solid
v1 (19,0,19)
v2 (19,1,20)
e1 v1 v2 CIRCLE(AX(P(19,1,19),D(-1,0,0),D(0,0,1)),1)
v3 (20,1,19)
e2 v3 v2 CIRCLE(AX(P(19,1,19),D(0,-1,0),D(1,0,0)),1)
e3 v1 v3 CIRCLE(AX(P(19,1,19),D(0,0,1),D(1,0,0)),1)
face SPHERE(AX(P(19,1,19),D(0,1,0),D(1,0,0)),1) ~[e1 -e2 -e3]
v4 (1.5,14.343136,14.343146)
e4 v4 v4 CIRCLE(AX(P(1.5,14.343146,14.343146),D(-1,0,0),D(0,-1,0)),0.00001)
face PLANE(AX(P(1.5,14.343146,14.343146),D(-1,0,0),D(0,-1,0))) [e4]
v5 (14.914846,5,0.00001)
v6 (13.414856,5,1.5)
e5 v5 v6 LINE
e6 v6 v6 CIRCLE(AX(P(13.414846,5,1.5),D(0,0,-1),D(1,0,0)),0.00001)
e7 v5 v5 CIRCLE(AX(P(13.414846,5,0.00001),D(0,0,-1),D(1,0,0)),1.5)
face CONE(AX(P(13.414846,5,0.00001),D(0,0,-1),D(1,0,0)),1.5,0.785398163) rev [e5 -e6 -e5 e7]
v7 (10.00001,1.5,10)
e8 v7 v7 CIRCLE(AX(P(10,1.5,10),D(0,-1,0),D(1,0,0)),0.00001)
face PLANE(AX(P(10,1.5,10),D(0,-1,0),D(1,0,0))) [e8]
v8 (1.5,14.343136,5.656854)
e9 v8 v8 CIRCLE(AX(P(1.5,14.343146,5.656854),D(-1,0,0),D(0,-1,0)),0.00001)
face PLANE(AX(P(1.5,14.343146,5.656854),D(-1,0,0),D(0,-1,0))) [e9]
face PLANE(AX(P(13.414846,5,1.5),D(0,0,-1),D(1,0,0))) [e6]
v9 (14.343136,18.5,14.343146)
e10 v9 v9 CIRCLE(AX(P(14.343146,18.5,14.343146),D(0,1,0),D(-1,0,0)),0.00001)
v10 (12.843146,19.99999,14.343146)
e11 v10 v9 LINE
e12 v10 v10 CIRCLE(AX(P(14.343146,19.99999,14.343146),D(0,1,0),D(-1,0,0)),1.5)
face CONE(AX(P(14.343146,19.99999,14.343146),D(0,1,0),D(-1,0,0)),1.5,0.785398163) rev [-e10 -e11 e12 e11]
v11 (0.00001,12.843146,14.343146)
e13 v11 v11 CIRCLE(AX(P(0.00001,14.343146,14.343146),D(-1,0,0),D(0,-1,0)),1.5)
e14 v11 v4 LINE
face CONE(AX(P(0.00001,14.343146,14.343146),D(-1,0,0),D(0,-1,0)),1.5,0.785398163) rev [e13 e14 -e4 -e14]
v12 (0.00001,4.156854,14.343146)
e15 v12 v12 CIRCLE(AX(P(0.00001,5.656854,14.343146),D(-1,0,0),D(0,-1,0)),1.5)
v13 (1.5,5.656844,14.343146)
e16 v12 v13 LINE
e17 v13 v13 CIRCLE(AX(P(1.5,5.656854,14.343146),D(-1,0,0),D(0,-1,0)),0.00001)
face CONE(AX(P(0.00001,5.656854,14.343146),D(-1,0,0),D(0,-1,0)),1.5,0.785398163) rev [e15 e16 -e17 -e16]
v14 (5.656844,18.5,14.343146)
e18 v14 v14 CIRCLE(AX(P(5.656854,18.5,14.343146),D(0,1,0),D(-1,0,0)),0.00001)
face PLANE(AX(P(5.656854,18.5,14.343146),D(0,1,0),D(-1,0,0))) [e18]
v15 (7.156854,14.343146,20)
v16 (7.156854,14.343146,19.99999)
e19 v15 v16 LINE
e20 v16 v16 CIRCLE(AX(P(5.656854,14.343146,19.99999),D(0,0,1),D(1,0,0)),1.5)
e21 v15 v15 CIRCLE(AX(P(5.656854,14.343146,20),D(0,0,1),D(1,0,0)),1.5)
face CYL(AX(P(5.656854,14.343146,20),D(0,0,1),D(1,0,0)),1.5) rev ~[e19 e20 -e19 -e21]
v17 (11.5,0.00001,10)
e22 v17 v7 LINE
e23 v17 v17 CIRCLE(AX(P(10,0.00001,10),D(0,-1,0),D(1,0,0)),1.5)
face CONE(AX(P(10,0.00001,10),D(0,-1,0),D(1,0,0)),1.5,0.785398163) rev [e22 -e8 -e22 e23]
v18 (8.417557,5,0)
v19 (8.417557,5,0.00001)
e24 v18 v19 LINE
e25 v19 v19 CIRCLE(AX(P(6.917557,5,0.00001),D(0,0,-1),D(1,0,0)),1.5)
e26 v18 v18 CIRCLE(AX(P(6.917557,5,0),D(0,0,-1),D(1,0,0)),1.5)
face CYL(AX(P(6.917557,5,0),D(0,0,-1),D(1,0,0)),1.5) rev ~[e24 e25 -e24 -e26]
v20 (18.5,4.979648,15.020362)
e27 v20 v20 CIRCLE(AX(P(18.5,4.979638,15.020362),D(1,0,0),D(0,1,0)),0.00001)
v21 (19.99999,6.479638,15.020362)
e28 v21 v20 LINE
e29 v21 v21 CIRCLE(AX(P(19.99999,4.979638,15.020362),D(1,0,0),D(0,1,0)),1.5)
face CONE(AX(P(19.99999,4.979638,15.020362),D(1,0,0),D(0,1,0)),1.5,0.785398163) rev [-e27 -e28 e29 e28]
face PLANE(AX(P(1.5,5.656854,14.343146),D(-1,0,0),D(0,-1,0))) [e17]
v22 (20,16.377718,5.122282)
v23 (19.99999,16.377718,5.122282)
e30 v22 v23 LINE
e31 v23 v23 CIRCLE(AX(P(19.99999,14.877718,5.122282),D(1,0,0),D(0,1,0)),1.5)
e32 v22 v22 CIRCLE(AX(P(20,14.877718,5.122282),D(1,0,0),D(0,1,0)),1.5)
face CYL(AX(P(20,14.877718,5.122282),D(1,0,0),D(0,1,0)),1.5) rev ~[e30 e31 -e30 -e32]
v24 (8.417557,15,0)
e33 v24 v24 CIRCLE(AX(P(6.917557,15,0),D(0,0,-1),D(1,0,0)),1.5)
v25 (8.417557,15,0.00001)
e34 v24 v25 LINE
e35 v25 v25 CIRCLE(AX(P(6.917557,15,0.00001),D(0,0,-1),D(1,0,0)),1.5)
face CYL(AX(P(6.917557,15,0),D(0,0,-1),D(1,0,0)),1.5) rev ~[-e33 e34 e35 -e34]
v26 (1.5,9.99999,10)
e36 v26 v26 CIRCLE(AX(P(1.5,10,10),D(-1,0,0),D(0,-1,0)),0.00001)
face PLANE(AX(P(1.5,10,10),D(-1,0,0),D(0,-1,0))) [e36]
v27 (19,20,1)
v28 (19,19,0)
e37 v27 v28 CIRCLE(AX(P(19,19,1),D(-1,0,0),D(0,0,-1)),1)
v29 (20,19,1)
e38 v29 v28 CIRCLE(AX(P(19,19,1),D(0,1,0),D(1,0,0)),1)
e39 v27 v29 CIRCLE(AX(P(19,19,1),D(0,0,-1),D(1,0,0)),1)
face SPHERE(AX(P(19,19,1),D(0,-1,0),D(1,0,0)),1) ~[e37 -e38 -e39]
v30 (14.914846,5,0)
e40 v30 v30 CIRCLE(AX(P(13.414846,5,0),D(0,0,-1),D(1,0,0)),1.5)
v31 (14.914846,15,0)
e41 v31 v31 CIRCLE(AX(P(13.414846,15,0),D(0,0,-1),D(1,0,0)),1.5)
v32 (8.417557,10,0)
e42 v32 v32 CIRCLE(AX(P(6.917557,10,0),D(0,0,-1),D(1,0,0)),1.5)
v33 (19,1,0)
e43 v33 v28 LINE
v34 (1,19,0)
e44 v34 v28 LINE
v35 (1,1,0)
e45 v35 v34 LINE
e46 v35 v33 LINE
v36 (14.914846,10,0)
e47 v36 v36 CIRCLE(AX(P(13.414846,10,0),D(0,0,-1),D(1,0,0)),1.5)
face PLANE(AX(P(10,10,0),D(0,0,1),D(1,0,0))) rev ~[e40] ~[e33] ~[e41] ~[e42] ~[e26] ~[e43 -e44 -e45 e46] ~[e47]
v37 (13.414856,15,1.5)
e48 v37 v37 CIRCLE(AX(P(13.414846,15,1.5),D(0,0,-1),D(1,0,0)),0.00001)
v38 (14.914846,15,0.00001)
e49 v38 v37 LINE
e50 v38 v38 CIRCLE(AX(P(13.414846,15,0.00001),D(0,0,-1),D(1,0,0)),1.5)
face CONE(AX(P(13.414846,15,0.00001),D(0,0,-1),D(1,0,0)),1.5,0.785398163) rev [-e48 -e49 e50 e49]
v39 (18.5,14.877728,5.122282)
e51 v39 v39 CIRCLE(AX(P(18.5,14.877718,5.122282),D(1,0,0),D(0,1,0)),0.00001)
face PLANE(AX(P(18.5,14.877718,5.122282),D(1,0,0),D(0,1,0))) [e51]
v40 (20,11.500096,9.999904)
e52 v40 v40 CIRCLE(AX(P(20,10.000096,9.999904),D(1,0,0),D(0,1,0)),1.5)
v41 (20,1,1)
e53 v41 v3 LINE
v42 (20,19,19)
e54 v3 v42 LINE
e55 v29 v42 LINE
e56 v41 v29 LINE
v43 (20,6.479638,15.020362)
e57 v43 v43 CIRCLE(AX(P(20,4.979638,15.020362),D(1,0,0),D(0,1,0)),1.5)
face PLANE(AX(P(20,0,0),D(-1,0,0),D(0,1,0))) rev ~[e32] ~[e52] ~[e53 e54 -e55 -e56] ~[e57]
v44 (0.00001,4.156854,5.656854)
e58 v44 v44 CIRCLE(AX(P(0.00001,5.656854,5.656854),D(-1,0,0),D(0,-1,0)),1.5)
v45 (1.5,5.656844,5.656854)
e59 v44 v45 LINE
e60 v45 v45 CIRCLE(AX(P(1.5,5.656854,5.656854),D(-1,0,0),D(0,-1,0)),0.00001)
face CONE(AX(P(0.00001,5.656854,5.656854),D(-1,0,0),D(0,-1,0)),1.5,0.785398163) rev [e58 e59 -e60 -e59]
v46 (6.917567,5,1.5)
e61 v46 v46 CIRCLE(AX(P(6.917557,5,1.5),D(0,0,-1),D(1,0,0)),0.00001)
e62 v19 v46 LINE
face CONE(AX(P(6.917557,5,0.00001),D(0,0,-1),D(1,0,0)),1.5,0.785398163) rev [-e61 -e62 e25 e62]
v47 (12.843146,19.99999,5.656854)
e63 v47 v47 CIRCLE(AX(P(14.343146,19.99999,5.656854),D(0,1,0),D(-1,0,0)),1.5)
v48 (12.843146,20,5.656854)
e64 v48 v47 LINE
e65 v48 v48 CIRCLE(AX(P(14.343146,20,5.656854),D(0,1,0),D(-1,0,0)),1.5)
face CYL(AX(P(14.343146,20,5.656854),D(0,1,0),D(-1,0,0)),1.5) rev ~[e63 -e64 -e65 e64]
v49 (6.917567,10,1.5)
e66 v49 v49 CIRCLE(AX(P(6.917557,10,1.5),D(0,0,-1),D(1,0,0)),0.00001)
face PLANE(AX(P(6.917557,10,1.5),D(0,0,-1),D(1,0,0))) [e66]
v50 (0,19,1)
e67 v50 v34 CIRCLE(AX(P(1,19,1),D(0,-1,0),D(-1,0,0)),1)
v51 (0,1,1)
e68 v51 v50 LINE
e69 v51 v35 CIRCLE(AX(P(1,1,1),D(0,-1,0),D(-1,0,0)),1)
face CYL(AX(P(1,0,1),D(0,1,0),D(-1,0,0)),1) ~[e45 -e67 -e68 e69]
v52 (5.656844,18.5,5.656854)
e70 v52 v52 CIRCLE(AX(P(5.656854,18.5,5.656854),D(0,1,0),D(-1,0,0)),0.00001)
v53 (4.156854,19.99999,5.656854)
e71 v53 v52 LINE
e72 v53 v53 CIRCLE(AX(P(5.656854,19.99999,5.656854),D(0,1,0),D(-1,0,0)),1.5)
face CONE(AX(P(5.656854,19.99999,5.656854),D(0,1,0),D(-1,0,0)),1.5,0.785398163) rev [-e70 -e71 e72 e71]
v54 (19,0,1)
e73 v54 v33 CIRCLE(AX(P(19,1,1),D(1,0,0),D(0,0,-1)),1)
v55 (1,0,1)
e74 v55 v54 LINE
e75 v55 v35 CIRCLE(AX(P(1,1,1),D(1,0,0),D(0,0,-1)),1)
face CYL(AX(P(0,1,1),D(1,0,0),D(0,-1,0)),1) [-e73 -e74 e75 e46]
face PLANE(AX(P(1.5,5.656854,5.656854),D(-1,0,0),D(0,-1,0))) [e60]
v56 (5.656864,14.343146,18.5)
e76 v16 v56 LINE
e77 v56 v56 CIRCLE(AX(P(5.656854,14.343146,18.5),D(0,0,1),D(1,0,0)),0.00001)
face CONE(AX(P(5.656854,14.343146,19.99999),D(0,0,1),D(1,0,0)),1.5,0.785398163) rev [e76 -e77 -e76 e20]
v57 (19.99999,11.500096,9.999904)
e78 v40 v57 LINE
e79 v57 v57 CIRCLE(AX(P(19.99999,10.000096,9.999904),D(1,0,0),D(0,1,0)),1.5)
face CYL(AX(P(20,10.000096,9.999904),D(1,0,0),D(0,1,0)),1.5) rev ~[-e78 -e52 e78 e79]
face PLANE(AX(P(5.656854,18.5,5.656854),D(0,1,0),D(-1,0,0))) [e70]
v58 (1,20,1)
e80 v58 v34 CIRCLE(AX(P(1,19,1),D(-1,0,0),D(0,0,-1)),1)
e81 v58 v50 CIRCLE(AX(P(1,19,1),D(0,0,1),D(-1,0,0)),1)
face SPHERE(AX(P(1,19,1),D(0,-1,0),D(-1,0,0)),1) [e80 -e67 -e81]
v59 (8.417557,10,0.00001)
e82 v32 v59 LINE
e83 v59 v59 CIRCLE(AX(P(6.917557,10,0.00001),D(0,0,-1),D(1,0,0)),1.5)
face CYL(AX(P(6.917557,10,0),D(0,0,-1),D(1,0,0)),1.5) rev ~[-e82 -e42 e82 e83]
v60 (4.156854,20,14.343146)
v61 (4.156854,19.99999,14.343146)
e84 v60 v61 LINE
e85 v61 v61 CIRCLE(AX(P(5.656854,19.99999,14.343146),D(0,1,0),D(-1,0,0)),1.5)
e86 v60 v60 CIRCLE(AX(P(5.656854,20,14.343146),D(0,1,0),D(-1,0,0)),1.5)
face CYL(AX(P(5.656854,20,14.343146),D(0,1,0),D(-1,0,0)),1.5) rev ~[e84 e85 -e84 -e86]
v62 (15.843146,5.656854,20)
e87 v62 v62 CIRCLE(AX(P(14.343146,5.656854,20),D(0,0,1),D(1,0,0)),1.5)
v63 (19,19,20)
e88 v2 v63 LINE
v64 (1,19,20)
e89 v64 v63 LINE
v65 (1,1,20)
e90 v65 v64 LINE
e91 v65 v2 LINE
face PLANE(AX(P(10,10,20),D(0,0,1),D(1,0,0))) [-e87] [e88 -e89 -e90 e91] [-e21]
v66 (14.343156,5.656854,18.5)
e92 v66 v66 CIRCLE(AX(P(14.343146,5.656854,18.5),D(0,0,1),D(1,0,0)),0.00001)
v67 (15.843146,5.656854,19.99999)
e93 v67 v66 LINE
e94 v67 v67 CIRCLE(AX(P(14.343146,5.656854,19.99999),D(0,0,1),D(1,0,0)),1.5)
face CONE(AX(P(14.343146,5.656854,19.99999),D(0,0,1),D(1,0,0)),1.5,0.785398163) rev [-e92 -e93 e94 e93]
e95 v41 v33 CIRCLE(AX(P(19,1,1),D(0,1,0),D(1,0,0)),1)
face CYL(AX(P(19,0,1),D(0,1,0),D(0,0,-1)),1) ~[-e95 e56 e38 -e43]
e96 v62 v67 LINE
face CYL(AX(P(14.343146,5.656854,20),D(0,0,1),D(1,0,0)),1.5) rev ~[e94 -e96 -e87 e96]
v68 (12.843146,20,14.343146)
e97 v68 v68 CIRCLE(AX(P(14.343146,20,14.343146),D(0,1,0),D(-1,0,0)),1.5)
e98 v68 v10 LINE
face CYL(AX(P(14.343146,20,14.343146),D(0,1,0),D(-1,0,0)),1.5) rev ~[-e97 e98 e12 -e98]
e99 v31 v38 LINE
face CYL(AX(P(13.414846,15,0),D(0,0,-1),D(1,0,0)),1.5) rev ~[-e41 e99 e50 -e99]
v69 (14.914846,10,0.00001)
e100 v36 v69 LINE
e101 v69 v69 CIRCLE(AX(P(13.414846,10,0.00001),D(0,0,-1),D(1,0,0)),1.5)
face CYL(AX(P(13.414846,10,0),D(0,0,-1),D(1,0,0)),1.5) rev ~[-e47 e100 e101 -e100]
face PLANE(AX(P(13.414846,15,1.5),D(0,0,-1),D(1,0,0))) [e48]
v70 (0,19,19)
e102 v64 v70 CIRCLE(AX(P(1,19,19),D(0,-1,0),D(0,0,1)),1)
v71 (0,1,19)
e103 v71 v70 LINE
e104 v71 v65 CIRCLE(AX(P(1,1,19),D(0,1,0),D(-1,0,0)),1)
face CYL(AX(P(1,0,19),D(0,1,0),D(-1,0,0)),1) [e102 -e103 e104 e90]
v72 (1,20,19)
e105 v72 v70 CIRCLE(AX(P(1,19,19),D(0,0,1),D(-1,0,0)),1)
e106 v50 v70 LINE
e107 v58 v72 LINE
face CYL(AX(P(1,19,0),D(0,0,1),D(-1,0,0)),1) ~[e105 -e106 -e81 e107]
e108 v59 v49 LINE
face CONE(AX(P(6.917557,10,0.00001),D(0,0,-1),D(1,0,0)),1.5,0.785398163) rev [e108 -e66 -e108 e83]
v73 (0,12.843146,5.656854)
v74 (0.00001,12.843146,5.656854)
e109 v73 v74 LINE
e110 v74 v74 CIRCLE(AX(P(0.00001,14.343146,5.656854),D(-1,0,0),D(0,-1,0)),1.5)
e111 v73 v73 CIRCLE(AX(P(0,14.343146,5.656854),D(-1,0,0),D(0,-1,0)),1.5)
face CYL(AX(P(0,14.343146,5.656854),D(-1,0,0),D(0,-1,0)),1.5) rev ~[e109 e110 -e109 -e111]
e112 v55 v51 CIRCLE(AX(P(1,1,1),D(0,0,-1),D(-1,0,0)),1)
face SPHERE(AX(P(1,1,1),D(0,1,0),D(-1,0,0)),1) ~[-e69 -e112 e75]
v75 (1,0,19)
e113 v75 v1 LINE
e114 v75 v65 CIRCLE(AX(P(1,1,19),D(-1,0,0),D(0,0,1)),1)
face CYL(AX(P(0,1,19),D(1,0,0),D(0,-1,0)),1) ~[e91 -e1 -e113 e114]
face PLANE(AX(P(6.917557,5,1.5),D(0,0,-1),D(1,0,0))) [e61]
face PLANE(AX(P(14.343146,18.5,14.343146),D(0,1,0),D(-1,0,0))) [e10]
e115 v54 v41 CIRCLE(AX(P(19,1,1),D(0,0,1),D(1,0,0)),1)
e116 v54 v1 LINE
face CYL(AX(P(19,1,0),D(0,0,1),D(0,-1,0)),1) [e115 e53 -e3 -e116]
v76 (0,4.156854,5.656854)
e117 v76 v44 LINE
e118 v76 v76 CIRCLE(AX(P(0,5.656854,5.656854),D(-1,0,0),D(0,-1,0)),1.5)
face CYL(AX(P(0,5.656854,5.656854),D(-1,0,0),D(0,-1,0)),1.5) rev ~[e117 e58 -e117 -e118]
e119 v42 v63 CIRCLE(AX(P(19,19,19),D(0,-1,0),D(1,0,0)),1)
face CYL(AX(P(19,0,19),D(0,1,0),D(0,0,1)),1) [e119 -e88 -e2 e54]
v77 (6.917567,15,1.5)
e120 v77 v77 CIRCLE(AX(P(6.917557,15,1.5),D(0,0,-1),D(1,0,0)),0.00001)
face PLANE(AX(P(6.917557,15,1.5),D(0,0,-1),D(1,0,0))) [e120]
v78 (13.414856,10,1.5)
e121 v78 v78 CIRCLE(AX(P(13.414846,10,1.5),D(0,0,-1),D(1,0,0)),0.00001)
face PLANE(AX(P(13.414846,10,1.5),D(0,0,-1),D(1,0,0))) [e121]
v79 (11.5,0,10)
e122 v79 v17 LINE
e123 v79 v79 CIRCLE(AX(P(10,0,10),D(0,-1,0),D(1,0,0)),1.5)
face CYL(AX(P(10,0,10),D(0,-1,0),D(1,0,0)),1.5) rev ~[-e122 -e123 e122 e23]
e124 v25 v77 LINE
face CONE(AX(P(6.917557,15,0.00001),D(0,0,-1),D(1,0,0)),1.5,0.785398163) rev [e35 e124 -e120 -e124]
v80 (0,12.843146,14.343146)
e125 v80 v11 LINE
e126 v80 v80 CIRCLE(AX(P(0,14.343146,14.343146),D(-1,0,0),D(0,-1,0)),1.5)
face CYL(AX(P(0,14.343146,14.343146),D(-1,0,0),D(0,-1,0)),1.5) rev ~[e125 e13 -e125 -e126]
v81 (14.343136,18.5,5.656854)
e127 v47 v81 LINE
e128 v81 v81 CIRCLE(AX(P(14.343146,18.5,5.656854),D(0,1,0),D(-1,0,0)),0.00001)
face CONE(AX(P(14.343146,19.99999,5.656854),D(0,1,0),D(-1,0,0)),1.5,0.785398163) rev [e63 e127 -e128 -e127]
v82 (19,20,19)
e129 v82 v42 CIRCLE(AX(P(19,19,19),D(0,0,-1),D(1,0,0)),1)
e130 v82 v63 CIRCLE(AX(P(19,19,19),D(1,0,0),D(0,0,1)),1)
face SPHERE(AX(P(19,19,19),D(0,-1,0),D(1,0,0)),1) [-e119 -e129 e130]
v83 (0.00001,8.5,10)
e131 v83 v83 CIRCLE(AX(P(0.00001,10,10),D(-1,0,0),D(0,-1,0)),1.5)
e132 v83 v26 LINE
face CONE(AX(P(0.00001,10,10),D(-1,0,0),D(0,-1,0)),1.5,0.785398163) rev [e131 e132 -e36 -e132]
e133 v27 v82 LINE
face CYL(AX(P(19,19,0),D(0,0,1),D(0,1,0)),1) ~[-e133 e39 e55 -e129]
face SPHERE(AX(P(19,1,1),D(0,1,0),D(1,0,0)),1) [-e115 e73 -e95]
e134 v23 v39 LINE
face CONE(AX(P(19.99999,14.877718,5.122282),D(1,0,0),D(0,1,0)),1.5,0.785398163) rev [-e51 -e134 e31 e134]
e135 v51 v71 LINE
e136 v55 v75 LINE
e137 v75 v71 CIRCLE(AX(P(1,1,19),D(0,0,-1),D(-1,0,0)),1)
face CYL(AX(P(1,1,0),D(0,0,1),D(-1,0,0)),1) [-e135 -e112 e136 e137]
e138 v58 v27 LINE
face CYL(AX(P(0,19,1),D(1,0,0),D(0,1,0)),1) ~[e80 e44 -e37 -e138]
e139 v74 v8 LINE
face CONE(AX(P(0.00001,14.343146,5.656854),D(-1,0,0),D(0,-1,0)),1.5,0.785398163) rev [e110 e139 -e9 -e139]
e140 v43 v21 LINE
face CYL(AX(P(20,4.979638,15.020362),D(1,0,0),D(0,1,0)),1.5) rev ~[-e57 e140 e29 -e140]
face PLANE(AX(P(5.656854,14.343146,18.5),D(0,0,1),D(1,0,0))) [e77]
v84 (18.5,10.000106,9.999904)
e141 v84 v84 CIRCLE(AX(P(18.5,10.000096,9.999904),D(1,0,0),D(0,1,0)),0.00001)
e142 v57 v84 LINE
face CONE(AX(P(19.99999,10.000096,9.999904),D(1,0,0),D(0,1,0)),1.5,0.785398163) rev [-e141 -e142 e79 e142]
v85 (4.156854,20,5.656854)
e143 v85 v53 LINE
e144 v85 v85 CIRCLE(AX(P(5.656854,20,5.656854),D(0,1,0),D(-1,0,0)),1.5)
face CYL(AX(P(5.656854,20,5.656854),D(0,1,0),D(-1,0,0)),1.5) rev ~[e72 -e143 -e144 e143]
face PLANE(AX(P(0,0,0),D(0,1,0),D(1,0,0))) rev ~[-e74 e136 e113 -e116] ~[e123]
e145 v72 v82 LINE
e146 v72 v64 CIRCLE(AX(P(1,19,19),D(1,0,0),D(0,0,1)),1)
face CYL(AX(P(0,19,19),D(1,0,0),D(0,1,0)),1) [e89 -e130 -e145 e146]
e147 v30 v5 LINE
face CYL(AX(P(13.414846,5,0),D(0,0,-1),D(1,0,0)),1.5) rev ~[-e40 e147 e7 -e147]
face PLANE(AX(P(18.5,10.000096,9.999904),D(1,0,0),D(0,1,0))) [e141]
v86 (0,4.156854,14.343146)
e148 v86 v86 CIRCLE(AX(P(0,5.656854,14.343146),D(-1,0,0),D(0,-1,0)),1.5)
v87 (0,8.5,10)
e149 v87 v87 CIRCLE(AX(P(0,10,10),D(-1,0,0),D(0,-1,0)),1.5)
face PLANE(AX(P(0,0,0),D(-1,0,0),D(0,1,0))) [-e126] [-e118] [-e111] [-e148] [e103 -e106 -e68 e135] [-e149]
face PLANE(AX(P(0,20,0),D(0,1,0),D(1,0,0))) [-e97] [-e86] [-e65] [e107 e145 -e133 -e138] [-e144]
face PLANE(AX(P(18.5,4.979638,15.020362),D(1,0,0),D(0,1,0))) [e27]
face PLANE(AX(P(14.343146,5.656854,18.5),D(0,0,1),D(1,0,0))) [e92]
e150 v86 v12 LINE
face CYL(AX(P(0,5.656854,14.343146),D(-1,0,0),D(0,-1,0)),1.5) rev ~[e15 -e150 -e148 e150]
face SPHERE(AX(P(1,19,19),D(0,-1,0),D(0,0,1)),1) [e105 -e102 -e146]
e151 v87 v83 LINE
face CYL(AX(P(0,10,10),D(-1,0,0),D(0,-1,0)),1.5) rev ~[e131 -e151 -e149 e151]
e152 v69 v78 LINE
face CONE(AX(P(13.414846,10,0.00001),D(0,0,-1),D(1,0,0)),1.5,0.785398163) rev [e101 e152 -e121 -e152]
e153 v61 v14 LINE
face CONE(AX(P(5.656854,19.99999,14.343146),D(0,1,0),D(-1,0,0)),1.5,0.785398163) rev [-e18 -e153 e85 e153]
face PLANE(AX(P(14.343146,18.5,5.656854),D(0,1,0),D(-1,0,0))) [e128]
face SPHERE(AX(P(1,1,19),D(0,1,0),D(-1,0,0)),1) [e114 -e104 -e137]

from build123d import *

# Parameters (mm, degrees)
F0_W      = 20
F0_H      = 20
F1_DEPTH  = 20
F2_R      = 1.5
F3_DEPTH  = 1.5
F4_R      = 1
F5_SIZE   = 1.49999
F9_R      = 1.5
F10_DEPTH = 1.5
F11_SIZE  = 1.49999
F8_R      = 1.5
F12_DEPTH = 1.5
F13_SIZE  = 1.49999
F6_R      = 1.5
F14_DEPTH = 1.5
F15_SIZE  = 1.49999
F7_R      = 1.5
F16_DEPTH = 1.5
F17_SIZE  = 1.49999
F18_R     = 1.5
F19_DEPTH = 1.5
F20_SIZE  = 1.49999


# Not quite as in the source:
# - a fillet or chamfer is up to 0.001 mm smaller than in the source, because OpenCascade refuses the exact size


with BuildPart() as f1:
    # F0 (on Top) → F1 (new body)
    with BuildSketch(Plane.XY):
        with Locations((10, 10)):
            Rectangle(F0_W, F0_H)
    extrude(amount=F1_DEPTH)

    # F2 (on face) → F3 (cut)
    with BuildSketch(Plane.XZ):
        with Locations((10, 10)):
            Circle(F2_R)
    extrude(amount=-F3_DEPTH, mode=Mode.SUBTRACT)

    # F4
    f4_edges = [f1.edges().sort_by_distance(p)[0] for p in [
        (0, 10, 20),
        (20, 10, 20),
        (20, 10, 0),
        (0, 10, 0),
        (0, 0, 10),
        (20, 0, 10),
        (20, 20, 10),
        (10, 20, 20),
        (0, 20, 10),
        (10, 0, 0),
        (10, 20, 0),
        (10, 0, 20),
    ]]
    fillet(f4_edges, radius=F4_R)

    # F5 (size 1.5 in the source; OpenCascade refuses exactly that, so slightly less here)
    f5_edges = [f1.edges().sort_by_distance(p)[0] for p in [
        (8.5, 1.5, 10),
    ]]
    chamfer(f5_edges, length=F5_SIZE)

    # F9 (on face) → F10 (cut)
    with BuildSketch(Plane(origin=(0, 0, 0), x_dir=(0, -1, 0), z_dir=(-1, 0, 0))):
        with Locations((-5.6568542495, 14.3431457505)):
            Circle(F9_R)
        with Locations((-10, 10)):
            Circle(F9_R)
        with Locations((-14.3431457505, 5.6568542495)):
            Circle(F9_R)
        with Locations((-5.6568542495, 5.6568542495)):
            Circle(F9_R)
        with Locations((-14.3431457505, 14.3431457505)):
            Circle(F9_R)
    extrude(amount=-F10_DEPTH, mode=Mode.SUBTRACT)

    # F11 (size 1.5 in the source; OpenCascade refuses exactly that, so slightly less here)
    f11_edges = [f1.edges().sort_by_distance(p)[0] for p in [
        (1.5, 11.5, 10),
        (1.5, 15.843146, 5.656854),
        (1.5, 15.843146, 14.343146),
        (1.5, 7.156854, 14.343146),
        (1.5, 7.156854, 5.656854),
    ]]
    chamfer(f11_edges, length=F11_SIZE)

    # F8 (on face) → F12 (cut)
    with BuildSketch(Plane(origin=(0, 0, 0), x_dir=(1, 0, 0), z_dir=(0, 0, -1))):
        with Locations((6.9175572135, -5)):
            Circle(F8_R)
        with Locations((13.4148458019, -5)):
            Circle(F8_R)
        with Locations((6.9175572135, -10)):
            Circle(F8_R)
        with Locations((13.4148458019, -10)):
            Circle(F8_R)
        with Locations((6.9175572135, -15)):
            Circle(F8_R)
        with Locations((13.4148458019, -15)):
            Circle(F8_R)
    extrude(amount=-F12_DEPTH, mode=Mode.SUBTRACT)

    # F13 (size 1.5 in the source; OpenCascade refuses exactly that, so slightly less here)
    f13_edges = [f1.edges().sort_by_distance(p)[0] for p in [
        (5.417557, 5, 1.5),
        (11.914846, 5, 1.5),
        (5.417557, 10, 1.5),
        (11.914846, 10, 1.5),
        (11.914846, 15, 1.5),
        (5.417557, 15, 1.5),
    ]]
    chamfer(f13_edges, length=F13_SIZE)

    # F6 (on face) → F14 (cut)
    with BuildSketch(Plane.YZ.offset(20)):
        with Locations((4.979637754, 15.020362246)):
            Circle(F6_R)
        with Locations((10.0000959005, 9.9999040995)):
            Circle(F6_R)
        with Locations((14.8777184771, 5.1222815229)):
            Circle(F6_R)
    extrude(amount=-F14_DEPTH, mode=Mode.SUBTRACT)

    # F15 (size 1.5 in the source; OpenCascade refuses exactly that, so slightly less here)
    f15_edges = [f1.edges().sort_by_distance(p)[0] for p in [
        (18.5, 3.479638, 15.020362),
        (18.5, 8.500096, 9.999904),
        (18.5, 13.377718, 5.122282),
    ]]
    chamfer(f15_edges, length=F15_SIZE)

    # F7 (on face) → F16 (cut)
    with BuildSketch(Plane(origin=(0, 20, 0), x_dir=(-1, 0, 0), z_dir=(0, 1, 0))):
        with Locations((-14.3431457505, 14.3431457505)):
            Circle(F7_R)
        with Locations((-5.6568542495, 14.3431457505)):
            Circle(F7_R)
        with Locations((-14.3431457505, 5.6568542495)):
            Circle(F7_R)
        with Locations((-5.6568542495, 5.6568542495)):
            Circle(F7_R)
    extrude(amount=-F16_DEPTH, mode=Mode.SUBTRACT)

    # F17 (size 1.5 in the source; OpenCascade refuses exactly that, so slightly less here)
    f17_edges = [f1.edges().sort_by_distance(p)[0] for p in [
        (15.843146, 18.5, 14.343146),
        (7.156854, 18.5, 14.343146),
        (7.156854, 18.5, 5.656854),
        (15.843146, 18.5, 5.656854),
    ]]
    chamfer(f17_edges, length=F17_SIZE)

    # F18 (on face) → F19 (cut)
    with BuildSketch(Plane.XY.offset(20)):
        with Locations((5.6568542495, 14.3431457505)):
            Circle(F18_R)
        with Locations((14.3431457505, 5.6568542495)):
            Circle(F18_R)
    extrude(amount=-F19_DEPTH, mode=Mode.SUBTRACT)

    # F20 (size 1.5 in the source; OpenCascade refuses exactly that, so slightly less here)
    f20_edges = [f1.edges().sort_by_distance(p)[0] for p in [
        (4.156854, 14.343146, 18.5),
        (12.843146, 5.656854, 18.5),
    ]]
    chamfer(f20_edges, length=F20_SIZE)


solid = f1.part
